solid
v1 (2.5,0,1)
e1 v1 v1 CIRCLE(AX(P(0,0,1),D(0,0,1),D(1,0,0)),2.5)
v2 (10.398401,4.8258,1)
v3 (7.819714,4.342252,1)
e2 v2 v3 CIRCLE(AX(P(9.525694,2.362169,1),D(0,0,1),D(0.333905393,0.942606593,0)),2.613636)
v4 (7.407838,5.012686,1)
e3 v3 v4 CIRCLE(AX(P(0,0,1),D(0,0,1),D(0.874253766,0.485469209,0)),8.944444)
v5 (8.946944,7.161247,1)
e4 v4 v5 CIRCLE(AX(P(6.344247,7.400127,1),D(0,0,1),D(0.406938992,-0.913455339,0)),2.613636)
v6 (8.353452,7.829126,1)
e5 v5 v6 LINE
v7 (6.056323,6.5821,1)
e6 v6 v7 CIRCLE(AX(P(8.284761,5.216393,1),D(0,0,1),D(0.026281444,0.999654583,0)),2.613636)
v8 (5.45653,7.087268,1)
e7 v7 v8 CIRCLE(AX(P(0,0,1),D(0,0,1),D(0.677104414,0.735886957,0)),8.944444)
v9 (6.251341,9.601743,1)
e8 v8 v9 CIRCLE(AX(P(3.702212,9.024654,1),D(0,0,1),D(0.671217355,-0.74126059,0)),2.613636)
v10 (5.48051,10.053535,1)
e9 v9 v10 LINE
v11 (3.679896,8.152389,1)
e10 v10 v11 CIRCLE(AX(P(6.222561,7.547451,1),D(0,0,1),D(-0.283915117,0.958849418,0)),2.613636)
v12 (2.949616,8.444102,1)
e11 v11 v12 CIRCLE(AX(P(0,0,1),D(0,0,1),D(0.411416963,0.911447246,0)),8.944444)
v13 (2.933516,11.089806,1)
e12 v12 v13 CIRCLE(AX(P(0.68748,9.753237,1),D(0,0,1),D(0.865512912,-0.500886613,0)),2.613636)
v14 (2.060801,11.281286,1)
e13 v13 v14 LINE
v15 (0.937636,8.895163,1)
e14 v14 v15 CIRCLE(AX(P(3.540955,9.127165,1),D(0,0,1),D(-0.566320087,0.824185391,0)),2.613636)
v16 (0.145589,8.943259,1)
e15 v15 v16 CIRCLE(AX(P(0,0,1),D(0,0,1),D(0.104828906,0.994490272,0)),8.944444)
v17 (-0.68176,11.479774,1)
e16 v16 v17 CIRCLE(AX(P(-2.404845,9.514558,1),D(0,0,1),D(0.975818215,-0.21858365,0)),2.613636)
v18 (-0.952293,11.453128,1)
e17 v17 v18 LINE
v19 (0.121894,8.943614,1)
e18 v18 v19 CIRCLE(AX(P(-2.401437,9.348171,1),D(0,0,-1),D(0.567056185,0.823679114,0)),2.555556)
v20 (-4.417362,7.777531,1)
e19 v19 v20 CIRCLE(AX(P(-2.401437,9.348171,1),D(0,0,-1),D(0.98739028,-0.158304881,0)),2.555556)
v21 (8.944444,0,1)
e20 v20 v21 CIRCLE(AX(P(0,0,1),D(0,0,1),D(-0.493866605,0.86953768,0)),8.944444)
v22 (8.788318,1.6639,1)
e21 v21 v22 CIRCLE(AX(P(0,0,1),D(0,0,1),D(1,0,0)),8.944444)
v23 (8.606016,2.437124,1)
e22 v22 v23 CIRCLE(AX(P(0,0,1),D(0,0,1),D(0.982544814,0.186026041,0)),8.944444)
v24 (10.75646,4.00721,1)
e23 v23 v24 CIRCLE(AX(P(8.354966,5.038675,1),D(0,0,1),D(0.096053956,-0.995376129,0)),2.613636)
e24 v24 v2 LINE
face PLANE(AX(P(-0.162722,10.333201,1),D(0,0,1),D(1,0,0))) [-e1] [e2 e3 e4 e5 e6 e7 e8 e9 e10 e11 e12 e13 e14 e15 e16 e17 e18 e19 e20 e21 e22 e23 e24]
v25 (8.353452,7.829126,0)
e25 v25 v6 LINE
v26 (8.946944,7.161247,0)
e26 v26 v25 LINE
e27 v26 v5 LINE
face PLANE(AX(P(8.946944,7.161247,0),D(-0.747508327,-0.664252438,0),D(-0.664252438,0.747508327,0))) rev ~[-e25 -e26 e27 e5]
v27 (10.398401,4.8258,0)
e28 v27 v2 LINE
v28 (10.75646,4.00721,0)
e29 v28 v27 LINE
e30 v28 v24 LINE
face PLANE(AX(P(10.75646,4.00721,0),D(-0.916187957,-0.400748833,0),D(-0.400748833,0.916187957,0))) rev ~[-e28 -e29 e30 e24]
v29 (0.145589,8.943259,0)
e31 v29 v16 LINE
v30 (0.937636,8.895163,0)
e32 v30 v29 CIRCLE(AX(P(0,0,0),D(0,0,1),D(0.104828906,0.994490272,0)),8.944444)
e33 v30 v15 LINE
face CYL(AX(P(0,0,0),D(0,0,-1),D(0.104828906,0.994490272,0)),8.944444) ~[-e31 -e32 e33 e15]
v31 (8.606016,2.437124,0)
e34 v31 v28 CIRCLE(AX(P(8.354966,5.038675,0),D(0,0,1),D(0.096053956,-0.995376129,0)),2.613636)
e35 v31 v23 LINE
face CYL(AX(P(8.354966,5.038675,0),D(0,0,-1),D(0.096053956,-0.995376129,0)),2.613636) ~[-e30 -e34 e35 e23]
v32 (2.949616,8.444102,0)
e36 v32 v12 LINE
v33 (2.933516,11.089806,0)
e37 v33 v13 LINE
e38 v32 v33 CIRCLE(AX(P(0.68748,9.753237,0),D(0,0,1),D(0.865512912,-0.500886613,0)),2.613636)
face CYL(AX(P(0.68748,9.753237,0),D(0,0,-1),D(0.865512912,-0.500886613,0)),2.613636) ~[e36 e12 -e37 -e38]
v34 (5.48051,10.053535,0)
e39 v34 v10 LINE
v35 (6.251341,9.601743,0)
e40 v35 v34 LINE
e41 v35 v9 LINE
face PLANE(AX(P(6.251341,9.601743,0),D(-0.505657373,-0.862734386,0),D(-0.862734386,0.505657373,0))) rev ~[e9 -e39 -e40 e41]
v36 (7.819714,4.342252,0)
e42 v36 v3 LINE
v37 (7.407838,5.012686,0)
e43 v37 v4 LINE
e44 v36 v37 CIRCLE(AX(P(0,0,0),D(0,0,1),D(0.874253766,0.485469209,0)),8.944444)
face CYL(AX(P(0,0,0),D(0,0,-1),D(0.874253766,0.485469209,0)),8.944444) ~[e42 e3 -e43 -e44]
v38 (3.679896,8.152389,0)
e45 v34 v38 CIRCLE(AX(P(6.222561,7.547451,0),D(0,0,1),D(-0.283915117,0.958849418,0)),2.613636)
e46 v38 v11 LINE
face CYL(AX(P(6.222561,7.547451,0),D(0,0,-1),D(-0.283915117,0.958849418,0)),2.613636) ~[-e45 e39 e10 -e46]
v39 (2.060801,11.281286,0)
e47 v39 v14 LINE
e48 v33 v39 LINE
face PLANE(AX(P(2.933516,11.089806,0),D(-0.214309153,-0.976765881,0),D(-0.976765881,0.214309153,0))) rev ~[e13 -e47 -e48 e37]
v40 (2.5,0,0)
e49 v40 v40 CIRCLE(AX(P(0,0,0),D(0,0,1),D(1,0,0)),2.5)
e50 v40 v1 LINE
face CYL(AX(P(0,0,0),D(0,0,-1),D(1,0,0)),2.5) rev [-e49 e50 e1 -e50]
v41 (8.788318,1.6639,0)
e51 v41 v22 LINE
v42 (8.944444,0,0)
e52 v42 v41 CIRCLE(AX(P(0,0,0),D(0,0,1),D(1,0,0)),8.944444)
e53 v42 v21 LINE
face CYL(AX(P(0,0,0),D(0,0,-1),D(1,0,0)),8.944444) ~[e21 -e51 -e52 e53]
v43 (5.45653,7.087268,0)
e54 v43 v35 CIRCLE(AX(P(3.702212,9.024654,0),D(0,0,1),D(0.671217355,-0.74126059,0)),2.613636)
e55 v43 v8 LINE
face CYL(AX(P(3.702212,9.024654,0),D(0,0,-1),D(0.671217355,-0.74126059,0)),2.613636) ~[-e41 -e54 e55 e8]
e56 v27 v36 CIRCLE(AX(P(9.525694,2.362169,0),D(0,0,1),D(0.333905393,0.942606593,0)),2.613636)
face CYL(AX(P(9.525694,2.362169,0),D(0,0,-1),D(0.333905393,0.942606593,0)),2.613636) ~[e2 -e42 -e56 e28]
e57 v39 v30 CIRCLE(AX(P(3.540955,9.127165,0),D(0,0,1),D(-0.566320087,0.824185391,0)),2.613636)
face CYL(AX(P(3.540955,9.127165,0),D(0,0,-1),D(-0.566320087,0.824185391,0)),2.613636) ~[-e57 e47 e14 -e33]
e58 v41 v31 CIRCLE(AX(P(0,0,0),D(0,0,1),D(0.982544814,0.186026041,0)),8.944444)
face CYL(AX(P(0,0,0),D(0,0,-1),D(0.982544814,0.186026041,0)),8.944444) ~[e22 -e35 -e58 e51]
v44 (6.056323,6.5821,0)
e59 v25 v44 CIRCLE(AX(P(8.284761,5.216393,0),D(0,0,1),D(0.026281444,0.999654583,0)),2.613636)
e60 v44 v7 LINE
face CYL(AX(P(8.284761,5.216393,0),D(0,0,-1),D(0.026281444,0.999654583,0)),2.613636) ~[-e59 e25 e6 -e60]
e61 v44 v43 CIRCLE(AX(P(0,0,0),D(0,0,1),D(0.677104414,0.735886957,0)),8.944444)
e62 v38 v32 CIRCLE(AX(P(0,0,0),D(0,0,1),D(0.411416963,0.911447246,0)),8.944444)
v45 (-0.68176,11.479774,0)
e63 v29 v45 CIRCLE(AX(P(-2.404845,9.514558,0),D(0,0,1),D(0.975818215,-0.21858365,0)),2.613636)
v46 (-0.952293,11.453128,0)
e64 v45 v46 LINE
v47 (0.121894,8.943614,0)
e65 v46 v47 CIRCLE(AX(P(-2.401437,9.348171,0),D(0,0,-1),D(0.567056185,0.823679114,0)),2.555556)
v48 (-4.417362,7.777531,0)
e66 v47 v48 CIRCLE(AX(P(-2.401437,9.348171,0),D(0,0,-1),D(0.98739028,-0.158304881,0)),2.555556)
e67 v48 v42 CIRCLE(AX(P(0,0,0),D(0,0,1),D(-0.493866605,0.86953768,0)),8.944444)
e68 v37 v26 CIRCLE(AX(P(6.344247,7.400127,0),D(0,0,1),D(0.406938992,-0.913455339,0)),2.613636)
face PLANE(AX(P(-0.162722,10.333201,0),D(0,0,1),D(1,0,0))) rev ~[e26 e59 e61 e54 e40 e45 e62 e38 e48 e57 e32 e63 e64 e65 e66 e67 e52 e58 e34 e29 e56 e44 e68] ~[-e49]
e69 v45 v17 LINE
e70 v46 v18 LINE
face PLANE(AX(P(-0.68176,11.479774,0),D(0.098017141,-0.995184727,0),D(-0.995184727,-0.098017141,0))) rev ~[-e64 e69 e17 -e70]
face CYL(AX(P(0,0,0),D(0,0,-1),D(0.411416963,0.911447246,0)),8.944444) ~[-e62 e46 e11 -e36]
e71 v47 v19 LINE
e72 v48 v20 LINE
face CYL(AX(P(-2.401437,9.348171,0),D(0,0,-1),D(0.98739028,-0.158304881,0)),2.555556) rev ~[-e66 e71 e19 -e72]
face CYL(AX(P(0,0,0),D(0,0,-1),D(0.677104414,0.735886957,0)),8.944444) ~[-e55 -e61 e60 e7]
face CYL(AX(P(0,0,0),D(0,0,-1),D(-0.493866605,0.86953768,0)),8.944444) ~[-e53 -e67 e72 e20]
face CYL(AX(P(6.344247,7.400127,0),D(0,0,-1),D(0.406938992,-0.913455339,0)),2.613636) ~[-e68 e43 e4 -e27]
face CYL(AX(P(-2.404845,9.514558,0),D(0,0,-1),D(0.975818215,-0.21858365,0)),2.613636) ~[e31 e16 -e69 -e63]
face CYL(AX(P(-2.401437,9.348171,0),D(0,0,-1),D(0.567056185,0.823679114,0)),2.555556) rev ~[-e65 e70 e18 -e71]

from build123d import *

# Parameters (mm, degrees)
F2_R     = 2.5
F3_DEPTH = 1


# Not quite as in the source:
# - a feature of the source that left no trace in its solid (it failed there, or was rolled back) is left out


with BuildPart() as f3:
    # F2 (on Top) → F3 (new body)
    with BuildSketch(Plane.XY):
        with BuildLine():
            ThreePointArc((-0.9522931143, 11.4531284813), (-0.0520635974, 10.3538099613), (0.1218940174, 8.943613826))
            ThreePointArc((0.1218940174, 8.943613826), (0.1337416353, 8.9434445039), (0.1455890186, 8.9432594873))
            ThreePointArc((0.1455890186, 8.9432594873), (0.0799521539, 10.3250380062), (-0.6817601701, 11.4797736507))
            Line((-0.6817601701, 11.4797736507), (-0.9522931143, 11.4531284813))
        make_face()
        with BuildLine():
            ThreePointArc((-4.4173624076, 7.7775314708), (-4.4995685223, -7.7302632253), (8.9444444444, 0))
            ThreePointArc((8.9444444444, 0), (8.9053271725, 0.8356041947), (8.7883175045, 1.6638995942))
            ThreePointArc((8.7883175045, 1.6638995942), (8.7057555111, 2.0525368209), (8.6060160514, 2.4371241541))
            ThreePointArc((8.6060160514, 2.4371241541), (8.2679218833, 3.4124117792), (7.8197142384, 4.3422523705))
            ThreePointArc((7.8197142384, 4.3422523705), (7.6211518715, 4.6820007018), (7.4078378155, 5.0126864374))
            ThreePointArc((7.4078378155, 5.0126864374), (6.7776596323, 5.8366442695), (6.0563228133, 6.5820999993))
            ThreePointArc((6.0563228133, 6.5820999993), (5.761965129, 6.84126043), (5.4565297326, 7.0872681406))
            ThreePointArc((5.4565297326, 7.0872681406), (4.5991510413, 7.6714337721), (3.6798961663, 8.1523892587))
            ThreePointArc((3.6798961663, 8.1523892587), (3.3179634912, 8.306275019), (2.9496159434, 8.4441016222))
            ThreePointArc((2.9496159434, 8.4441016222), (1.9566672267, 8.7278026893), (0.937636324, 8.8951629858))
            ThreePointArc((0.937636324, 8.8951629858), (0.542146294, 8.9279988696), (0.1455890186, 8.9432594873))
            ThreePointArc((0.1455890186, 8.9432594873), (0.1337416353, 8.9434445039), (0.1218940174, 8.943613826))
            ThreePointArc((0.1218940174, 8.943613826), (-1.7655892516, 6.8729814141), (-4.4173624076, 7.7775314708))
        make_face()
        Circle(F2_R, mode=Mode.SUBTRACT)
        with BuildLine():
            ThreePointArc((7.8197142384, 4.3422523705), (8.2679218833, 3.4124117792), (8.6060160514, 2.4371241541))
            ThreePointArc((8.6060160514, 2.4371241541), (9.8961633699, 2.9277974972), (10.7564598893, 4.0072095278))
            Line((10.7564598893, 4.0072095278), (10.398401005, 4.8258001529))
            ThreePointArc((10.398401005, 4.8258001529), (9.0439881545, 4.931031832), (7.8197142384, 4.3422523705))
        make_face()
        with BuildLine():
            ThreePointArc((6.0563228133, 6.5820999993), (6.7776596323, 5.8366442695), (7.4078378155, 5.0126864374))
            ThreePointArc((7.4078378155, 5.0126864374), (8.4689810733, 5.8780879937), (8.9469442237, 7.1612466333))
            Line((8.9469442237, 7.1612466333), (8.3534515739, 7.8291263012))
            ThreePointArc((8.3534515739, 7.8291263012), (7.0378063332, 7.5133903393), (6.0563228133, 6.5820999993))
        make_face()
        with BuildLine():
            ThreePointArc((3.6798961663, 8.1523892587), (4.5991510413, 7.6714337721), (5.4565297326, 7.0872681406))
            ThreePointArc((5.4565297326, 7.0872681406), (6.194311581, 8.236914632), (6.251341492, 9.6017430828))
            Line((6.251341492, 9.6017430828), (5.4805102725, 10.0535350783))
            ThreePointArc((5.4805102725, 10.0535350783), (4.3249499065, 9.344717804), (3.6798961663, 8.1523892587))
        make_face()
        with BuildLine():
            ThreePointArc((2.0608006124, 11.2812858546), (1.1761963647, 10.2402731247), (0.937636324, 8.8951629858))
            ThreePointArc((0.937636324, 8.8951629858), (1.9566672267, 8.7278026893), (2.9496159434, 8.4441016222))
            ThreePointArc((2.9496159434, 8.4441016222), (3.3010678965, 9.7691415234), (2.9335160712, 11.08980608))
            Line((2.9335160712, 11.08980608), (2.0608006124, 11.2812858546))
        make_face()
    extrude(amount=F3_DEPTH)


solid = f3.part
